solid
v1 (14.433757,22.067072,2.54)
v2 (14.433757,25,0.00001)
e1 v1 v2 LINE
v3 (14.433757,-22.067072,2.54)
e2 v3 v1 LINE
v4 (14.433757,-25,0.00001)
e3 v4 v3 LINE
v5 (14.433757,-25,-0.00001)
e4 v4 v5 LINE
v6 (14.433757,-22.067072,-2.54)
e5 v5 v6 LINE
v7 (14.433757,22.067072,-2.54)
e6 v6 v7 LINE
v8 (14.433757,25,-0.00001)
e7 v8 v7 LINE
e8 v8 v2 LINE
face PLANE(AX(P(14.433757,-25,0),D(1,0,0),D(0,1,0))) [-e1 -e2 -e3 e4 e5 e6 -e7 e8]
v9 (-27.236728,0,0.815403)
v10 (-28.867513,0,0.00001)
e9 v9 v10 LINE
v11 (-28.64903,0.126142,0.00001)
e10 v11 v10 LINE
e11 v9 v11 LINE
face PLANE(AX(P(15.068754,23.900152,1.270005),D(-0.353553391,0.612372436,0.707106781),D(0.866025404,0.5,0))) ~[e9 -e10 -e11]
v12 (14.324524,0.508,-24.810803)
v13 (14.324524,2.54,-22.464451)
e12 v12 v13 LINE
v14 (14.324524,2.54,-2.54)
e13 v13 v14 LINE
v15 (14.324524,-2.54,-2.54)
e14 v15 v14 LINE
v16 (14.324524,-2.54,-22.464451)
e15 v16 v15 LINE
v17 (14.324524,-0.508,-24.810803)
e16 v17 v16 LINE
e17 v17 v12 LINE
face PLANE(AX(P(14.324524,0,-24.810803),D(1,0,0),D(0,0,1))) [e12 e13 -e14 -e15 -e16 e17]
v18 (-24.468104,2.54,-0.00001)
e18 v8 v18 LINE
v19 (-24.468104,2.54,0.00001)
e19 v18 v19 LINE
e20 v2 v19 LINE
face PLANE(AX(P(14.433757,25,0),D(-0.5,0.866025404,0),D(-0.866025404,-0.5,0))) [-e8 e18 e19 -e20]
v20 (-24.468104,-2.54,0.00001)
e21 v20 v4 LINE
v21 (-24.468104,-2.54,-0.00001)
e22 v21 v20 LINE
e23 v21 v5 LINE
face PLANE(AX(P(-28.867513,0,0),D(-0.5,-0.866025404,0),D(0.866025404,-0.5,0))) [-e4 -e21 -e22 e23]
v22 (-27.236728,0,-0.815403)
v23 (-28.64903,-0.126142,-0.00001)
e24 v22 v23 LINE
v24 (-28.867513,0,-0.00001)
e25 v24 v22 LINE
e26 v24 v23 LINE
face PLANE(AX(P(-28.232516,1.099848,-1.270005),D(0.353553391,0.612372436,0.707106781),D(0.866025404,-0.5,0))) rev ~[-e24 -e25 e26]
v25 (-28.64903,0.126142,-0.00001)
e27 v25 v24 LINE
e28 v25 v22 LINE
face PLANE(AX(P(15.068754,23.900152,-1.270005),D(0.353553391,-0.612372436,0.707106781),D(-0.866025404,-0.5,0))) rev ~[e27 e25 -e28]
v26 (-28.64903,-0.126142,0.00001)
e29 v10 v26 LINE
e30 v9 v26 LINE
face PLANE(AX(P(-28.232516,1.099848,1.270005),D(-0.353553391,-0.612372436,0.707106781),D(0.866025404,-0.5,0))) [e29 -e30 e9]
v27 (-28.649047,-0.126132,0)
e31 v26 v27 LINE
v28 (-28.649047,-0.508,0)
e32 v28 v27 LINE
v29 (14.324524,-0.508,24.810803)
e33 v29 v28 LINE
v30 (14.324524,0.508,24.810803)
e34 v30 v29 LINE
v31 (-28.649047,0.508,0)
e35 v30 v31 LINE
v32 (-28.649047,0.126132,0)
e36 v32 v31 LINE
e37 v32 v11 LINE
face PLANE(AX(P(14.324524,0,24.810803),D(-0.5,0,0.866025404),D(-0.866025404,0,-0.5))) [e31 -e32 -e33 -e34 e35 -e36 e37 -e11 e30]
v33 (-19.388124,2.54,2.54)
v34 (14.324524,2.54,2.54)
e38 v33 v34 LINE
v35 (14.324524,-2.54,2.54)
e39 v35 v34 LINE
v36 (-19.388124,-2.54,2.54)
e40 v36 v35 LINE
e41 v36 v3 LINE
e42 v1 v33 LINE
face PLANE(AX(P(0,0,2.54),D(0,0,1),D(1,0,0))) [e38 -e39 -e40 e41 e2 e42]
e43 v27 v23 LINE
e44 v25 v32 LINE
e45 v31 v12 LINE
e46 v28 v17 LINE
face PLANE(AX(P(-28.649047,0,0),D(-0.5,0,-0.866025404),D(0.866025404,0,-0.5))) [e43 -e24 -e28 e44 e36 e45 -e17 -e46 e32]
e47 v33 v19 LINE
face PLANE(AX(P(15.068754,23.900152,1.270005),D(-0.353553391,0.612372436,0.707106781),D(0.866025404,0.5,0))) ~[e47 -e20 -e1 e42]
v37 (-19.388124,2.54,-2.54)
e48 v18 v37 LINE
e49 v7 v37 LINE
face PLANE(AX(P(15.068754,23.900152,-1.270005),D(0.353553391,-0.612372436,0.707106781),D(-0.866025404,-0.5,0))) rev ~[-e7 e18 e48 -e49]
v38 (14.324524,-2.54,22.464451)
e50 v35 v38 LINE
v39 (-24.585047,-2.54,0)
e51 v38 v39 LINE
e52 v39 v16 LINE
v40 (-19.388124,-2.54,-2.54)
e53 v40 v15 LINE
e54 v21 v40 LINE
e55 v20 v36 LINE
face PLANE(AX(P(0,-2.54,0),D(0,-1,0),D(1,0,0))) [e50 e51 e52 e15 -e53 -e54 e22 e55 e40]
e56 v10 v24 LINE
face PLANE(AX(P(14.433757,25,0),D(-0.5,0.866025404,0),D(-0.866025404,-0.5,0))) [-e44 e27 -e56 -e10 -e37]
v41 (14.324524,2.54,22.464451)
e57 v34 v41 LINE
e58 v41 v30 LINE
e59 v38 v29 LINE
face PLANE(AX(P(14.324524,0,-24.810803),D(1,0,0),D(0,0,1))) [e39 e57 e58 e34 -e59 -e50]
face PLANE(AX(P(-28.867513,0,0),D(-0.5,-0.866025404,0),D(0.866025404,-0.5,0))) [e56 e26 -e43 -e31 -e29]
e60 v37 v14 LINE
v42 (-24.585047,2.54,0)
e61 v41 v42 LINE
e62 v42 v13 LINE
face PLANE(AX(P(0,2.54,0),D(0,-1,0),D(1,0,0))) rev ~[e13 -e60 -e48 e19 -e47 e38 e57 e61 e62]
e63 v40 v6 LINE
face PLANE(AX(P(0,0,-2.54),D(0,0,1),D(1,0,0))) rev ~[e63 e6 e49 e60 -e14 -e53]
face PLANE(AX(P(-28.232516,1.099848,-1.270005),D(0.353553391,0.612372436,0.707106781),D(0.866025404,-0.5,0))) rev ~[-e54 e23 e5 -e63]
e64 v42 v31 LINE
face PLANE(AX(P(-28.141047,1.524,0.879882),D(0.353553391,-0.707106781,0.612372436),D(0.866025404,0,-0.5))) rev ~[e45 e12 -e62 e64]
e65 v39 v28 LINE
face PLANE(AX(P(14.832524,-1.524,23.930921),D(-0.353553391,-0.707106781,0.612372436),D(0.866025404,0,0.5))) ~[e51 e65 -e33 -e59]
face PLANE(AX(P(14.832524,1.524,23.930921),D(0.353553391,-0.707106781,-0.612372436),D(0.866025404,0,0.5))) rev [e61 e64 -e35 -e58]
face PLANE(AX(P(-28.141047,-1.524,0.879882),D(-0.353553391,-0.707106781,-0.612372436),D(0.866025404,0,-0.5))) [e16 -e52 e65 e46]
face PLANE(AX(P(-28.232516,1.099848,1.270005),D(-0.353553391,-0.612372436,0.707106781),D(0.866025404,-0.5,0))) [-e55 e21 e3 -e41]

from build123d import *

# Parameters (mm, degrees)
F1_DEPTH = 2.54
F2_SIZE  = 2.53999
F4_DEPTH = 2.54
F5_SIZE  = 2.032


# Not quite as in the source:
# - a fillet or chamfer is up to 0.001 mm smaller than in the source, because OpenCascade refuses the exact size


with BuildPart() as f1:
    # F0 (on Top) → F1 (new body, symmetric)
    with BuildSketch(Plane.XY):
        Polygon((14.4337567297, -25), (14.4337567297, 25), (-28.8675134595, 0), align=None)
    extrude(amount=F1_DEPTH, both=True)

    # F2 (size 2.54 in the source; OpenCascade refuses exactly that, so slightly less here)
    f2_edges = [f1.edges().sort_by_distance(p)[0] for p in [
        (-7.216878, 12.5, 2.54),
        (-7.216878, -12.5, 2.54),
        (-7.216878, -12.5, -2.54),
        (-7.216878, 12.5, -2.54),
    ]]
    chamfer(f2_edges, length=F2_SIZE)

    # F3 (on Front) → F4 (join, symmetric)
    with BuildSketch(Plane.XZ):
        Polygon((14.3245235085, -24.810802511), (14.3245235085, 24.810802511), (-28.6490470171, 0), align=None)
    extrude(amount=F4_DEPTH, both=True)

    # F5
    f5_edges = [f1.edges().sort_by_distance(p)[0] for p in [
        (-7.162262, 2.54, 12.405401),
        (-7.162262, -2.54, 12.405401),
        (-7.162262, -2.54, -12.405401),
        (-7.162262, 2.54, -12.405401),
    ]]
    chamfer(f5_edges, length=F5_SIZE)


solid = f1.part
